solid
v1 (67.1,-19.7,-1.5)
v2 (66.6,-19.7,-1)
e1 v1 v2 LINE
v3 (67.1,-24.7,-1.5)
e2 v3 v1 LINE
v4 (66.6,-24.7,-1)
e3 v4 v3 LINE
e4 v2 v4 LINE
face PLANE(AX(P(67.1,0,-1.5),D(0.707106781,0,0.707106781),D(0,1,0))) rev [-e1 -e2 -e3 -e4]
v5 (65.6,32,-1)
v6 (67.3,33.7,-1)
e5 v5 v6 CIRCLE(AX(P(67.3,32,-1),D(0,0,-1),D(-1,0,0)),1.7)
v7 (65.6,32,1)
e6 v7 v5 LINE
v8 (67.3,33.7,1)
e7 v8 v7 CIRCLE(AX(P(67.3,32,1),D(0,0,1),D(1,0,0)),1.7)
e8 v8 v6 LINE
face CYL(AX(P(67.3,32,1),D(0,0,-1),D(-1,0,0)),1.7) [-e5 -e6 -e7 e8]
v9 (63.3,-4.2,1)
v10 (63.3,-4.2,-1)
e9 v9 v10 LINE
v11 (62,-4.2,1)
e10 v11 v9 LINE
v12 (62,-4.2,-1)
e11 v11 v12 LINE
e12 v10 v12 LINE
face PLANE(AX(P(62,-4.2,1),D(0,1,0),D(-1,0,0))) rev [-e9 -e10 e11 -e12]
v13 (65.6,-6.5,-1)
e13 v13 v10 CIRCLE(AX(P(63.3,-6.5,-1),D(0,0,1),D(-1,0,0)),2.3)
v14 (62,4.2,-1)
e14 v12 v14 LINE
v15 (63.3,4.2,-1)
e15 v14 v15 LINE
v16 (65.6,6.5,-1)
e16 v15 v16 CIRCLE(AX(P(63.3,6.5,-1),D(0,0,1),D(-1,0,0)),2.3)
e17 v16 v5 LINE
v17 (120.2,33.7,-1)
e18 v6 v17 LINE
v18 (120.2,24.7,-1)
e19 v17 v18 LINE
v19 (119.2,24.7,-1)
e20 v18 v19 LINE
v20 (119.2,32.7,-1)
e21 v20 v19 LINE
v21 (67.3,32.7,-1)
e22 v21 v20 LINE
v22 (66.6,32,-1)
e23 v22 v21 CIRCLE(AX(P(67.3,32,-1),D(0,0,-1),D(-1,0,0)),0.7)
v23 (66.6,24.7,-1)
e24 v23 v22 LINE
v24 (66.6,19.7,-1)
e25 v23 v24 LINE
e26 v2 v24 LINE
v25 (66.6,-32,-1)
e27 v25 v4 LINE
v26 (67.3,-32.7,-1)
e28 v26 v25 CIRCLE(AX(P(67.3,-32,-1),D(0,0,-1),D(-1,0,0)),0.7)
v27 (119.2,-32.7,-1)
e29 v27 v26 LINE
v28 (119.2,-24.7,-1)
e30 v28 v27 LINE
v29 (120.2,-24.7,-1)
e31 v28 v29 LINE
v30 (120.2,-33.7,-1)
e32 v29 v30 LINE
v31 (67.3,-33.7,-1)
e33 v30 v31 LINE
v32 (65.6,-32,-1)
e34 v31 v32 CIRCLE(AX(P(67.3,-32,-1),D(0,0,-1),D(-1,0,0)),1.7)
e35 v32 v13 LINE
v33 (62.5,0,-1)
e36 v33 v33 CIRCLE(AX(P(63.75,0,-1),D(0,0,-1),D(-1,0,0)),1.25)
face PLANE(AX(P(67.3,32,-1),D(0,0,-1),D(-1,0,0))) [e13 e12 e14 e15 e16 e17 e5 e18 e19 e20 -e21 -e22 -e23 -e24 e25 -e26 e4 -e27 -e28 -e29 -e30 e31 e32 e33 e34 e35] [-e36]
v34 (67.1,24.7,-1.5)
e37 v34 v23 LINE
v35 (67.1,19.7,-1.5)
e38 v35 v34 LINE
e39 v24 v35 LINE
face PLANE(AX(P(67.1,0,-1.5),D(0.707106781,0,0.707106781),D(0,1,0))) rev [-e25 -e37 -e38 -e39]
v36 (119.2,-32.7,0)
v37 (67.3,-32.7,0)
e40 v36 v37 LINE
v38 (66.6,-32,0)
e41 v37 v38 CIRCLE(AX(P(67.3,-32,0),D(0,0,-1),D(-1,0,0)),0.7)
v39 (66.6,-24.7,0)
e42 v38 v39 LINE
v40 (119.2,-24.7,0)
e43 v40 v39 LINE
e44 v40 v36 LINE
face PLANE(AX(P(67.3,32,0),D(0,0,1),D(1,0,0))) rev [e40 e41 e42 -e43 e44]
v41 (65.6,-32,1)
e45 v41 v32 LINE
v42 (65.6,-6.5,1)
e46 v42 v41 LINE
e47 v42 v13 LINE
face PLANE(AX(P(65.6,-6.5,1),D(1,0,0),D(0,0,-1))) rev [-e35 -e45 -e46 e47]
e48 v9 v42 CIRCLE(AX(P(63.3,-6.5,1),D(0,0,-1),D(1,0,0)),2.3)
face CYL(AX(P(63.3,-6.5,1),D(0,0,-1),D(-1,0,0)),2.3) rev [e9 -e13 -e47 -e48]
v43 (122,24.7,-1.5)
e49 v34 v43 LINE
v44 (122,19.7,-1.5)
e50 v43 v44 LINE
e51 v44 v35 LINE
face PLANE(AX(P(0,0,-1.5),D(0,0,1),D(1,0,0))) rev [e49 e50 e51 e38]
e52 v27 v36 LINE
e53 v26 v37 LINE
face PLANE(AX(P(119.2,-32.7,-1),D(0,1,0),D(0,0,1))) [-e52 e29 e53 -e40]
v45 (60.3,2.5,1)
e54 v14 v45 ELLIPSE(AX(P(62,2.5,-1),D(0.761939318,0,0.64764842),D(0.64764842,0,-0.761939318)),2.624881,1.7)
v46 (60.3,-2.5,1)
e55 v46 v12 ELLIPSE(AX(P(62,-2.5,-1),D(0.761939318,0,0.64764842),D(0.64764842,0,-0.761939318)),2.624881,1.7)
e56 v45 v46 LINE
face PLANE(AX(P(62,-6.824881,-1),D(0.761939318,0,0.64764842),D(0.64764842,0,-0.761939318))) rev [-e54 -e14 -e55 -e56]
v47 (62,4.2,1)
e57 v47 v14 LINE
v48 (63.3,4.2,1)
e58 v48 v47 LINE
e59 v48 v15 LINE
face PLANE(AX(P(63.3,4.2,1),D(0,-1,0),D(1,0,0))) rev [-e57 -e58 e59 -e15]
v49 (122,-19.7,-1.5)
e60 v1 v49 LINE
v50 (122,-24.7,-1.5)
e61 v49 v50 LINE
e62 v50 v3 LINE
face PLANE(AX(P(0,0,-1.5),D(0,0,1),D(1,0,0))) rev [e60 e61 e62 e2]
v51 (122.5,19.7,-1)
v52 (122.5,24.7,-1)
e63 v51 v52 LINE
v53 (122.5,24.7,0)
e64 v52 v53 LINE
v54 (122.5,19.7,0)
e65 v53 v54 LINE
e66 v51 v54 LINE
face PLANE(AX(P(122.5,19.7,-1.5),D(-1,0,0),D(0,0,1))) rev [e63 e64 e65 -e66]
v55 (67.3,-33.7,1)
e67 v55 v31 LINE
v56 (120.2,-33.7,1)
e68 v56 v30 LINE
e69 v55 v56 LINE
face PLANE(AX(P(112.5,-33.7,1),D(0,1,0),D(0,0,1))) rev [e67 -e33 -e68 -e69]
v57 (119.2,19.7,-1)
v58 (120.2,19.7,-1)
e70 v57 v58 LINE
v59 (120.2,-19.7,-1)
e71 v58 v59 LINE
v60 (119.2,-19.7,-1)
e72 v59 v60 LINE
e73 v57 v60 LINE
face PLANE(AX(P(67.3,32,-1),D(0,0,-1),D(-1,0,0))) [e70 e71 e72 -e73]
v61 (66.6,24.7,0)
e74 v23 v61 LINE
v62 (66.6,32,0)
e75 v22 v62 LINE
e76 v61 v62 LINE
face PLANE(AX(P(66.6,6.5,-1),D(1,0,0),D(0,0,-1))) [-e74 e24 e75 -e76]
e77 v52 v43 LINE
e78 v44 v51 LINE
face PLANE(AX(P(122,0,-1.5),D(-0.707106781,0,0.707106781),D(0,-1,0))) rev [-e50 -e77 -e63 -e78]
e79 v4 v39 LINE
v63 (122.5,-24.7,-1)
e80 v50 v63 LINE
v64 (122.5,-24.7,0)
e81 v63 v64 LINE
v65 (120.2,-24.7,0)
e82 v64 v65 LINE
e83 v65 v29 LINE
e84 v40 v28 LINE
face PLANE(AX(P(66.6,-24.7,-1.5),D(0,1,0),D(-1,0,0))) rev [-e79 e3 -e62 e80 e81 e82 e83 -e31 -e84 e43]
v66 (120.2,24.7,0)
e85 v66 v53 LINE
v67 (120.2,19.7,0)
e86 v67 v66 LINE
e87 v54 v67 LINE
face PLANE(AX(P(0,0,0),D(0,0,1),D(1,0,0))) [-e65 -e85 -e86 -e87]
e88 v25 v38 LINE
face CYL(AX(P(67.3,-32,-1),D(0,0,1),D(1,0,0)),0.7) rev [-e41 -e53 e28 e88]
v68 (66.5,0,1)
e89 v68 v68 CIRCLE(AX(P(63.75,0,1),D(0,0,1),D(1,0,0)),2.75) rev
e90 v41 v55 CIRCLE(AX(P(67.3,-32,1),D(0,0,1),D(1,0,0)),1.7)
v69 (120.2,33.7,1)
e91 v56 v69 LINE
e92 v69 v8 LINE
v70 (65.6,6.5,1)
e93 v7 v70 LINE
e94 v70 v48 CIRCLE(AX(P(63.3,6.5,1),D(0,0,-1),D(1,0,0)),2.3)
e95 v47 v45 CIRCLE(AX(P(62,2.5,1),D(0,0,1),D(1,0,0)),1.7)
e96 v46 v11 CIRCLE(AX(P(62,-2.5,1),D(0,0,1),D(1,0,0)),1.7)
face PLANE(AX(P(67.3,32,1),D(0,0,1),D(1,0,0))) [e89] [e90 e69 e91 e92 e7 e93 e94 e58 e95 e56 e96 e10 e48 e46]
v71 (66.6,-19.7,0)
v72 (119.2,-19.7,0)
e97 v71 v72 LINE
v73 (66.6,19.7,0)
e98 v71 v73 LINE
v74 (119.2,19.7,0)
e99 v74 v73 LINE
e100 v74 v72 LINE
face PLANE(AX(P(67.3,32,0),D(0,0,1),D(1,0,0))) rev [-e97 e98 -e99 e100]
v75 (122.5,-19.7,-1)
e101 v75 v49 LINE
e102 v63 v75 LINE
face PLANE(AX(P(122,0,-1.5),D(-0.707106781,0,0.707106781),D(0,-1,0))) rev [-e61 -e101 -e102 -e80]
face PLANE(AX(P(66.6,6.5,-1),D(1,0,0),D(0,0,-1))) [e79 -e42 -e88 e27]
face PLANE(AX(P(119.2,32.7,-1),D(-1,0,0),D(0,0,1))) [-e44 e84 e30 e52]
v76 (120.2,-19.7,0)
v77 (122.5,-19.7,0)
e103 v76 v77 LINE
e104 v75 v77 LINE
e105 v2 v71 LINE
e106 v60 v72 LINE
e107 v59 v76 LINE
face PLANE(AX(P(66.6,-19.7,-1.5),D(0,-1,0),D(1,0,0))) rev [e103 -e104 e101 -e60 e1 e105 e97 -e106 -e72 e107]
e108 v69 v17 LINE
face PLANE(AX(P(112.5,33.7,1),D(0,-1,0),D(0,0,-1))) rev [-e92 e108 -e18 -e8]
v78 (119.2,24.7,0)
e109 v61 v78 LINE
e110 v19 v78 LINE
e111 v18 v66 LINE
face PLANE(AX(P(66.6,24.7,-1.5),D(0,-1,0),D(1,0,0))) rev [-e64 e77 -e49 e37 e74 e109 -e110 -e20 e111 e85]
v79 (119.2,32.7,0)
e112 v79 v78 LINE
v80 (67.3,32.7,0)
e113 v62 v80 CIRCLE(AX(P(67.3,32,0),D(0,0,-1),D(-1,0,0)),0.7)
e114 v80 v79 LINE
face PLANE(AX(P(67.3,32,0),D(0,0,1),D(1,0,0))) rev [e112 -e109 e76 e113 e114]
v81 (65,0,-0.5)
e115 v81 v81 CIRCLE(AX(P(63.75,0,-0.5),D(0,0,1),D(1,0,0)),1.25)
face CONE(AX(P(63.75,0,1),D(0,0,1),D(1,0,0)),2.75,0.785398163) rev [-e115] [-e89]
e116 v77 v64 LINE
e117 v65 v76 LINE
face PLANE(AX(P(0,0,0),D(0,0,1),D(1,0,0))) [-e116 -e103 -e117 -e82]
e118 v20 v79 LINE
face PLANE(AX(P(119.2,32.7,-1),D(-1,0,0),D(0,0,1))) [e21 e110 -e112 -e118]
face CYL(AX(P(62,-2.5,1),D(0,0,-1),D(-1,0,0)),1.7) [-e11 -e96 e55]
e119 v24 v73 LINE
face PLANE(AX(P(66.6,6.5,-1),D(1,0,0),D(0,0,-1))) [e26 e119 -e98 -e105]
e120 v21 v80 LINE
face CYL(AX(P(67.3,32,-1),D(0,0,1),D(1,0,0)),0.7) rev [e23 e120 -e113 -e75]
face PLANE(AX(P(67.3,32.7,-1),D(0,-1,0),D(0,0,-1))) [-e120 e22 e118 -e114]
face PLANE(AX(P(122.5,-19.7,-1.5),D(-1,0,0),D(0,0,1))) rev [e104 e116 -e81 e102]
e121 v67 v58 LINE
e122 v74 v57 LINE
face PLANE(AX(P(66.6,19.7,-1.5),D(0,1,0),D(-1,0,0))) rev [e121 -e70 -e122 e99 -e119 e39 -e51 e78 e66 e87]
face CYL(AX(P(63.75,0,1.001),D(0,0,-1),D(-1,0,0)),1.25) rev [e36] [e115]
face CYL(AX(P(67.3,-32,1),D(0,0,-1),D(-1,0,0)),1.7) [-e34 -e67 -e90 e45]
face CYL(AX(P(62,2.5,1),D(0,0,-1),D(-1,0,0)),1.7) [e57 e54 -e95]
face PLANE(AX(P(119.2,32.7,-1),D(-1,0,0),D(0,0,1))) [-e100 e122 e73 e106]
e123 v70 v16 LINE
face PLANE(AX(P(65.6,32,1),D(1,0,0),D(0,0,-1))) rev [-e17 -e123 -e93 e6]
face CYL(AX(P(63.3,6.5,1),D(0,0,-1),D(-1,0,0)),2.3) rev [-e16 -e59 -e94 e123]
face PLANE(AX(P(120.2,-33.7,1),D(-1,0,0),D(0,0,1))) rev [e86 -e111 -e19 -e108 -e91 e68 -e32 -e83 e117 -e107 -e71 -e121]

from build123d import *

# Parameters (mm, degrees)
BOSS_EXTRUDE1_DEPTH = 1
BOSS_EXTRUDE2_START = 1
BOSS_EXTRUDE2_DEPTH = 1
CUT_EXTRUDE1_REACH  = 128.037
CUT_EXTRUDE2_REACH  = 126.851
SKETCH4_R           = 1.25
CHAMFER1_SIZE       = 1.5
SKETCH5_W           = 55.9
SKETCH5_H           = 5
BOSS_EXTRUDE3_DEPTH = 1.5
CHAMFER3_SIZE       = 0.5


with BuildPart() as part:
    # Sketch1 → Boss-Extrude1 (new body)
    with BuildSketch(Plane.XY):
        with BuildLine():
            Line((67.3, -33.7), (112.5, -33.7))
            Line((112.5, -33.7), (120.2, -33.7))
            Line((120.2, -33.7), (120.2, 33.7))
            Line((120.2, 33.7), (112.5, 33.7))
            Line((112.5, 33.7), (67.3, 33.7))
            ThreePointArc((67.3, 33.7), (66.097918472, 33.202081528), (65.6, 32))
            Line((65.6, 32), (65.6, 6.5))
            ThreePointArc((65.6, 6.5), (64.926345597, 4.873654403), (63.3, 4.2))
            Line((63.3, 4.2), (62, 4.2))
            ThreePointArc((62, 4.2), (60.797918472, 3.702081528), (60.3, 2.5))
            Line((60.3, 2.5), (60.3, -2.5))
            ThreePointArc((60.3, -2.5), (60.797918472, -3.702081528), (62, -4.2))
            Line((62, -4.2), (63.3, -4.2))
            ThreePointArc((63.3, -4.2), (64.926345597, -4.873654403), (65.6, -6.5))
            Line((65.6, -6.5), (65.6, -32))
            ThreePointArc((65.6, -32), (66.097918472, -33.202081528), (67.3, -33.7))
        make_face()
    extrude(amount=BOSS_EXTRUDE1_DEPTH)

    # Sketch2 → Boss-Extrude2 (add)
    with BuildSketch(Plane(origin=(0, 0, 0), x_dir=(-1, 0, 0), z_dir=(0, 0, -1)).offset(BOSS_EXTRUDE2_START)):
        with BuildLine():
            Line((-67.3, 33.7), (-120.2, 33.7))
            Line((-120.2, 33.7), (-120.2, -33.7))
            Line((-120.2, -33.7), (-67.3, -33.7))
            ThreePointArc((-67.3, -33.7), (-66.097918472, -33.202081528), (-65.6, -32))
            Line((-65.6, -32), (-65.6, -6.5))
            ThreePointArc((-65.6, -6.5), (-64.926345597, -4.873654403), (-63.3, -4.2))
            Line((-63.3, -4.2), (-62, -4.2))
            ThreePointArc((-62, -4.2), (-60.797918472, -3.702081528), (-60.3, -2.5))
            Line((-60.3, -2.5), (-60.3, 2.5))
            ThreePointArc((-60.3, 2.5), (-60.797918472, 3.702081528), (-62, 4.2))
            Line((-62, 4.2), (-63.3, 4.2))
            ThreePointArc((-63.3, 4.2), (-64.926345597, 4.873654403), (-65.6, 6.5))
            Line((-65.6, 6.5), (-65.6, 32))
            ThreePointArc((-65.6, 32), (-66.097918472, 33.202081528), (-67.3, 33.7))
        make_face()
        with BuildLine():
            Line((-67.3, 32.7), (-119.2, 32.7))
            Line((-119.2, 32.7), (-119.2, -32.7))
            Line((-119.2, -32.7), (-67.3, -32.7))
            ThreePointArc((-67.3, -32.7), (-66.805025253, -32.494974747), (-66.6, -32))
            Line((-66.6, -32), (-66.6, -6.5))
            Line((-66.6, -6.5), (-66.6, 6.5))
            Line((-66.6, 6.5), (-66.6, 32))
            ThreePointArc((-66.6, 32), (-66.805025253, 32.494974747), (-67.3, 32.7))
        make_face(mode=Mode.SUBTRACT)
    extrude(amount=-BOSS_EXTRUDE2_DEPTH)

    # Cut-Extrude1: up to this face of the body (flat: up to its plane)
    cut_extrude1_end = Plane(part.part.faces().sort_by_distance((62.65, -4.2, 0))[0])
    # Sketch3 → Cut-Extrude1 (cut, up to the picked face)
    with BuildSketch(Plane(origin=(0, 4.2, 0), x_dir=(1, 0, 0), z_dir=(0, 1, 0)), mode=Mode.PRIVATE) as cut_extrude1_sk1:
        Polygon((62, 1), (60.3, -1), (60.3, 1), align=None)
    cut_extrude1_tool1 = split(extrude(cut_extrude1_sk1.sketch, amount=-CUT_EXTRUDE1_REACH, mode=Mode.PRIVATE), bisect_by=cut_extrude1_end, keep=Keep.BOTH, mode=Mode.PRIVATE)
    add(cut_extrude1_tool1.solids().sort_by(Axis((60.866667, 4.2, -0.333333), (0, -1, 0)))[0], mode=Mode.SUBTRACT)

    # Sketch4 → Cut-Extrude2 (cut, up to next)
    with BuildSketch(Plane(origin=(0, 0, -1), x_dir=(-1, 0, 0), z_dir=(0, 0, -1)), mode=Mode.PRIVATE) as cut_extrude2_sk1:
        with Locations((-63.75, 0)):
            Circle(SKETCH4_R)
    cut_extrude2_tool1 = extrude(cut_extrude2_sk1.sketch, amount=-CUT_EXTRUDE2_REACH, mode=Mode.PRIVATE) & part.part
    add(cut_extrude2_tool1.solids().sort_by_distance((63.75, 0, -1))[0], mode=Mode.SUBTRACT)

    # Chamfer1
    chamfer1_edges = [part.edges().sort_by_distance(p)[0] for p in [
        (65, 0, 1),
    ]]
    chamfer(chamfer1_edges, length=CHAMFER1_SIZE)

    # Sketch5 → Boss-Extrude3 (add)
    with BuildSketch(Plane(origin=(0, 0, 0), x_dir=(-1, 0, 0), z_dir=(0, 0, -1))):
        with Locations((-94.55, -22.2)):
            Rectangle(SKETCH5_W, SKETCH5_H)
        with Locations((-94.55, 22.2)):
            Rectangle(SKETCH5_W, SKETCH5_H)
    extrude(amount=BOSS_EXTRUDE3_DEPTH)

    # Chamfer3
    chamfer3_edges = [part.edges().sort_by_distance(p)[0] for p in [
        (122.5, 22.2, -1.5),
        (122.5, -22.2, -1.5),
        (66.6, -22.2, -1.5),
        (66.6, 22.2, -1.5),
    ]]
    chamfer(chamfer3_edges, length=CHAMFER3_SIZE - 0.0001)  # a hair under: the kernel refuses the full size


solid = part.part
